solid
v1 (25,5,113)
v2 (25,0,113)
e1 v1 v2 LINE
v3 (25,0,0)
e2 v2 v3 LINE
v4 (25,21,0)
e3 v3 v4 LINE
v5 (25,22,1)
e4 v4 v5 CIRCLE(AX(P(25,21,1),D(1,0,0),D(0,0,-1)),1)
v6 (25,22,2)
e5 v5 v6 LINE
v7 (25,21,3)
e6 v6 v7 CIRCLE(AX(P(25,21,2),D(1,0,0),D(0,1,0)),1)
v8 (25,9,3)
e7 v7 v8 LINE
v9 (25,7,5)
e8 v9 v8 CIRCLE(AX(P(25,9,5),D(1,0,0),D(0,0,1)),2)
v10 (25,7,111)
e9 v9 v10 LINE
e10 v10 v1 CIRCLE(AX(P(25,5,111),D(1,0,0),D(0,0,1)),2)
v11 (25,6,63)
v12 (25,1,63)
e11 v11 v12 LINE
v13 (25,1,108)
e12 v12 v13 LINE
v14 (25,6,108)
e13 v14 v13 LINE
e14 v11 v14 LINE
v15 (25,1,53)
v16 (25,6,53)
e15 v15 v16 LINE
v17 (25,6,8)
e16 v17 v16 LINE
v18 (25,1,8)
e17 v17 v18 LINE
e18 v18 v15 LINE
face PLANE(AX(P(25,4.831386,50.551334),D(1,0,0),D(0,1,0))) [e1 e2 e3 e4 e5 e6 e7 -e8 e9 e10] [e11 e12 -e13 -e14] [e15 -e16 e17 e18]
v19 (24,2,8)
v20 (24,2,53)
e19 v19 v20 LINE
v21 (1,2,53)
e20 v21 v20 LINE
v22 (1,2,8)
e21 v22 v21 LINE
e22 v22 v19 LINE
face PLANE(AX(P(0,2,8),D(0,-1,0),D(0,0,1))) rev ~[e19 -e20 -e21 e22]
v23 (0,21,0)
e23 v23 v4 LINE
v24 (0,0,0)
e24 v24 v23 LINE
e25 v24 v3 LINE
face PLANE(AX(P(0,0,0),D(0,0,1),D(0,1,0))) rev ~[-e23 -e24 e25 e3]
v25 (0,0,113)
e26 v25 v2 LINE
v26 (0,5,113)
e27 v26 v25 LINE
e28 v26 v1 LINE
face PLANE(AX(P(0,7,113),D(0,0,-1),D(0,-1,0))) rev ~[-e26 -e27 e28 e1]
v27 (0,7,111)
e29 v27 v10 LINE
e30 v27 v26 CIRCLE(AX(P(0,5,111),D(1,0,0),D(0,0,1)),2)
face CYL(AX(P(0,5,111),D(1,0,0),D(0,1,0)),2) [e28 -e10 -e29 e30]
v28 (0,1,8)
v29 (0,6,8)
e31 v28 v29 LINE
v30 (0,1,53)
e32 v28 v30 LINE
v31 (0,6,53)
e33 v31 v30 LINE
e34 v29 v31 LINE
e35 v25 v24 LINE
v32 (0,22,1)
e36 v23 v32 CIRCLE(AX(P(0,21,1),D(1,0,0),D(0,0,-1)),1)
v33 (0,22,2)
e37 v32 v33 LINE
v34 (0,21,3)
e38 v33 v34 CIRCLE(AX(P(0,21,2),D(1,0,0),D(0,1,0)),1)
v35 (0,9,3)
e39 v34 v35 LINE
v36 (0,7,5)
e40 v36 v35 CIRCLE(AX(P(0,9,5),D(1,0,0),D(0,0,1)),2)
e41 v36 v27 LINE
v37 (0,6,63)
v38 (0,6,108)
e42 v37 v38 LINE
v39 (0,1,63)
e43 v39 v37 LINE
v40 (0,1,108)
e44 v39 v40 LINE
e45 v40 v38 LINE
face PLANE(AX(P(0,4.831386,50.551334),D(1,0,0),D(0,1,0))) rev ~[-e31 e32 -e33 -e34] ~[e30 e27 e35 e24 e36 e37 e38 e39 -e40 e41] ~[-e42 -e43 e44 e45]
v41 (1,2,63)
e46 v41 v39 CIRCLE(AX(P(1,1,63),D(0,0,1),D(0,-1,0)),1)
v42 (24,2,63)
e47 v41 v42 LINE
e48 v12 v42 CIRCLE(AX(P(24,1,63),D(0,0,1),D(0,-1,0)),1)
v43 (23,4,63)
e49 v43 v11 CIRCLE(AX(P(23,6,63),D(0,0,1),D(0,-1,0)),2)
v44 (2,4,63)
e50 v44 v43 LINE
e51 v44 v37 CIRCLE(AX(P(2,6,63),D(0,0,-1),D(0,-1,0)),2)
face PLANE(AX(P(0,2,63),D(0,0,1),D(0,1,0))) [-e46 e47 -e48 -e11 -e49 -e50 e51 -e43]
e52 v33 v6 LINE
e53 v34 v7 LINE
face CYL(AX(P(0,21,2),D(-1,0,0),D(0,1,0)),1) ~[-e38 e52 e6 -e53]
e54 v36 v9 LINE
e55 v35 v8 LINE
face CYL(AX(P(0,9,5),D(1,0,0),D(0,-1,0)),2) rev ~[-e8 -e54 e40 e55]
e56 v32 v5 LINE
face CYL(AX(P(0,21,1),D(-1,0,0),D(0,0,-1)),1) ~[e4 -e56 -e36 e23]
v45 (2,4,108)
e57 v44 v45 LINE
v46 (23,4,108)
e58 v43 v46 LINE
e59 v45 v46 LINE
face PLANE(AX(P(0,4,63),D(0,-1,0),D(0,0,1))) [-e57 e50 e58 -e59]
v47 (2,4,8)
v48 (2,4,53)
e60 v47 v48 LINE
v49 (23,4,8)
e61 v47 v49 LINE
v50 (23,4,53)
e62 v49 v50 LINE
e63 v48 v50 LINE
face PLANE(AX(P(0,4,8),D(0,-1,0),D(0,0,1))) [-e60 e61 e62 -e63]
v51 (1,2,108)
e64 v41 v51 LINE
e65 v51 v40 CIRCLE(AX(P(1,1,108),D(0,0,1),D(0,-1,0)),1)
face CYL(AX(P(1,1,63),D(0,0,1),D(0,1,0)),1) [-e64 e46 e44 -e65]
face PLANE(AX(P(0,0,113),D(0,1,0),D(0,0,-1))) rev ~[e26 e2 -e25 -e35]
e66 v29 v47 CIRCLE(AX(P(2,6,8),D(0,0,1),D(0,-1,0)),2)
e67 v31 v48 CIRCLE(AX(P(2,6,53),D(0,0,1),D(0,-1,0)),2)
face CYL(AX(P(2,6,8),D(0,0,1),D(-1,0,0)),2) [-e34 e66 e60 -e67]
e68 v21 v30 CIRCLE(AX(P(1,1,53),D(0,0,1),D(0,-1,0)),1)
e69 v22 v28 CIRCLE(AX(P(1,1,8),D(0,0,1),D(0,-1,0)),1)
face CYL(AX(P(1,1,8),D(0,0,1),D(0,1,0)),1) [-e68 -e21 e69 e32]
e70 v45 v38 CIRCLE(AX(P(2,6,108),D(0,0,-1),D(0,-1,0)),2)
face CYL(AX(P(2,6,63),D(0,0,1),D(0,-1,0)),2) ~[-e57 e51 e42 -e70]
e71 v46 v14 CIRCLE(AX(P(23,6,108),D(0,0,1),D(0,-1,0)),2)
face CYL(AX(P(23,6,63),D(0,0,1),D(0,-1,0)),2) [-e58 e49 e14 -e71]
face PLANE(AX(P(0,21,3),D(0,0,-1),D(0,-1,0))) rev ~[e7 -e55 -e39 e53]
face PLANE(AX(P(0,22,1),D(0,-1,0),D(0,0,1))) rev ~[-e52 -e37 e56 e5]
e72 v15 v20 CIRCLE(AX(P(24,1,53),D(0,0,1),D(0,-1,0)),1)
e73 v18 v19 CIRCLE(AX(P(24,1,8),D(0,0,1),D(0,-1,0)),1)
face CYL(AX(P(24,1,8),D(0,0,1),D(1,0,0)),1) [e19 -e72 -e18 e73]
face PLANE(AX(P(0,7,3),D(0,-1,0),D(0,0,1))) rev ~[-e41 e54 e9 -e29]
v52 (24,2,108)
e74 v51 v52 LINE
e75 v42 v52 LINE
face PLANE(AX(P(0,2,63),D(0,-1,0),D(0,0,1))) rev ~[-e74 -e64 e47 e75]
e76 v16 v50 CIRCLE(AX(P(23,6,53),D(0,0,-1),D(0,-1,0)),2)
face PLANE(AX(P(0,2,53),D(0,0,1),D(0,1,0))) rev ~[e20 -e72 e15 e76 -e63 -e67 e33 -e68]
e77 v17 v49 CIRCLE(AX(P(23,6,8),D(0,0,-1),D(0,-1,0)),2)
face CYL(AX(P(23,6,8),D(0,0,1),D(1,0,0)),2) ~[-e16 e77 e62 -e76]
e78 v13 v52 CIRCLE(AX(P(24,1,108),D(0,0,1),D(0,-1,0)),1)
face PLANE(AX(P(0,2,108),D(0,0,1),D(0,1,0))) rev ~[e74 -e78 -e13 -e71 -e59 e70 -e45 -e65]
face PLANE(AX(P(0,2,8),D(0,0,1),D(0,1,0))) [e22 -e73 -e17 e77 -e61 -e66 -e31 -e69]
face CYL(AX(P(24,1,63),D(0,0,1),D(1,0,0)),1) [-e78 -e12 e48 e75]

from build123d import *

# Parameters (mm, degrees)
F0_W     = 2
F0_H     = 45
F1_DEPTH = 25
F2_R     = 2
F4_R     = 1


# Not quite as in the source:
# - two fillets or chamfers of one size are made in one step


with BuildPart() as f1:
    # F0 (on Right) → F1 (new body)
    with BuildSketch(Plane.YZ):
        with BuildLine():
            Line((7, 113), (0, 113))
            Line((0, 113), (0, 0))
            Line((0, 0), (21, 0))
            ThreePointArc((21, 0), (21.7071067812, 0.2928932188), (22, 1))
            Line((22, 1), (22, 2))
            ThreePointArc((22, 2), (21.7071067812, 2.7071067812), (21, 3))
            Line((21, 3), (7, 3))
            Line((7, 3), (7, 113))
        make_face()
        with Locations((3, 30.5)):
            Rectangle(F0_W, F0_H, mode=Mode.SUBTRACT)
        with Locations((3, 85.5)):
            Rectangle(F0_W, F0_H, mode=Mode.SUBTRACT)
    extrude(amount=F1_DEPTH)

    # F2 (call 1 of 6: OpenCascade refuses the feature's edges together)
    f2_edges = [f1.edges().sort_by_distance(p)[0] for p in [
        (12.5, 7, 3),
    ]]
    fillet(f2_edges, radius=F2_R)

    # F2#2 (call 2 of 6)
    f2_2_edges = [f1.edges().sort_by_distance(p)[0] for p in [
        (12.5, 7, 113),
    ]]
    fillet(f2_2_edges, radius=F2_R)

    # F2#3 (call 3 of 6)
    f2_3_edges = [f1.edges().sort_by_distance(p)[0] for p in [
        (0, 4, 30.5),
    ]]
    fillet(f2_3_edges, radius=F2_R)

    # F2#4 (call 4 of 6)
    f2_4_edges = [f1.edges().sort_by_distance(p)[0] for p in [
        (25, 4, 30.5),
    ]]
    fillet(f2_4_edges, radius=F2_R)

    # F2#5 (call 5 of 6)
    f2_5_edges = [f1.edges().sort_by_distance(p)[0] for p in [
        (0, 4, 85.5),
    ]]
    fillet(f2_5_edges, radius=F2_R)

    # F2#6 (call 6 of 6)
    f2_6_edges = [f1.edges().sort_by_distance(p)[0] for p in [
        (25, 4, 85.5),
    ]]
    fillet(f2_6_edges, radius=F2_R)

    # F4
    f4_edges = [f1.edges().sort_by_distance(p)[0] for p in [
        (25, 2, 30.5),
        (25, 2, 85.5),
        (0, 2, 85.5),
        (0, 2, 30.5),
    ]]
    fillet(f4_edges, radius=F4_R)


solid = f1.part
